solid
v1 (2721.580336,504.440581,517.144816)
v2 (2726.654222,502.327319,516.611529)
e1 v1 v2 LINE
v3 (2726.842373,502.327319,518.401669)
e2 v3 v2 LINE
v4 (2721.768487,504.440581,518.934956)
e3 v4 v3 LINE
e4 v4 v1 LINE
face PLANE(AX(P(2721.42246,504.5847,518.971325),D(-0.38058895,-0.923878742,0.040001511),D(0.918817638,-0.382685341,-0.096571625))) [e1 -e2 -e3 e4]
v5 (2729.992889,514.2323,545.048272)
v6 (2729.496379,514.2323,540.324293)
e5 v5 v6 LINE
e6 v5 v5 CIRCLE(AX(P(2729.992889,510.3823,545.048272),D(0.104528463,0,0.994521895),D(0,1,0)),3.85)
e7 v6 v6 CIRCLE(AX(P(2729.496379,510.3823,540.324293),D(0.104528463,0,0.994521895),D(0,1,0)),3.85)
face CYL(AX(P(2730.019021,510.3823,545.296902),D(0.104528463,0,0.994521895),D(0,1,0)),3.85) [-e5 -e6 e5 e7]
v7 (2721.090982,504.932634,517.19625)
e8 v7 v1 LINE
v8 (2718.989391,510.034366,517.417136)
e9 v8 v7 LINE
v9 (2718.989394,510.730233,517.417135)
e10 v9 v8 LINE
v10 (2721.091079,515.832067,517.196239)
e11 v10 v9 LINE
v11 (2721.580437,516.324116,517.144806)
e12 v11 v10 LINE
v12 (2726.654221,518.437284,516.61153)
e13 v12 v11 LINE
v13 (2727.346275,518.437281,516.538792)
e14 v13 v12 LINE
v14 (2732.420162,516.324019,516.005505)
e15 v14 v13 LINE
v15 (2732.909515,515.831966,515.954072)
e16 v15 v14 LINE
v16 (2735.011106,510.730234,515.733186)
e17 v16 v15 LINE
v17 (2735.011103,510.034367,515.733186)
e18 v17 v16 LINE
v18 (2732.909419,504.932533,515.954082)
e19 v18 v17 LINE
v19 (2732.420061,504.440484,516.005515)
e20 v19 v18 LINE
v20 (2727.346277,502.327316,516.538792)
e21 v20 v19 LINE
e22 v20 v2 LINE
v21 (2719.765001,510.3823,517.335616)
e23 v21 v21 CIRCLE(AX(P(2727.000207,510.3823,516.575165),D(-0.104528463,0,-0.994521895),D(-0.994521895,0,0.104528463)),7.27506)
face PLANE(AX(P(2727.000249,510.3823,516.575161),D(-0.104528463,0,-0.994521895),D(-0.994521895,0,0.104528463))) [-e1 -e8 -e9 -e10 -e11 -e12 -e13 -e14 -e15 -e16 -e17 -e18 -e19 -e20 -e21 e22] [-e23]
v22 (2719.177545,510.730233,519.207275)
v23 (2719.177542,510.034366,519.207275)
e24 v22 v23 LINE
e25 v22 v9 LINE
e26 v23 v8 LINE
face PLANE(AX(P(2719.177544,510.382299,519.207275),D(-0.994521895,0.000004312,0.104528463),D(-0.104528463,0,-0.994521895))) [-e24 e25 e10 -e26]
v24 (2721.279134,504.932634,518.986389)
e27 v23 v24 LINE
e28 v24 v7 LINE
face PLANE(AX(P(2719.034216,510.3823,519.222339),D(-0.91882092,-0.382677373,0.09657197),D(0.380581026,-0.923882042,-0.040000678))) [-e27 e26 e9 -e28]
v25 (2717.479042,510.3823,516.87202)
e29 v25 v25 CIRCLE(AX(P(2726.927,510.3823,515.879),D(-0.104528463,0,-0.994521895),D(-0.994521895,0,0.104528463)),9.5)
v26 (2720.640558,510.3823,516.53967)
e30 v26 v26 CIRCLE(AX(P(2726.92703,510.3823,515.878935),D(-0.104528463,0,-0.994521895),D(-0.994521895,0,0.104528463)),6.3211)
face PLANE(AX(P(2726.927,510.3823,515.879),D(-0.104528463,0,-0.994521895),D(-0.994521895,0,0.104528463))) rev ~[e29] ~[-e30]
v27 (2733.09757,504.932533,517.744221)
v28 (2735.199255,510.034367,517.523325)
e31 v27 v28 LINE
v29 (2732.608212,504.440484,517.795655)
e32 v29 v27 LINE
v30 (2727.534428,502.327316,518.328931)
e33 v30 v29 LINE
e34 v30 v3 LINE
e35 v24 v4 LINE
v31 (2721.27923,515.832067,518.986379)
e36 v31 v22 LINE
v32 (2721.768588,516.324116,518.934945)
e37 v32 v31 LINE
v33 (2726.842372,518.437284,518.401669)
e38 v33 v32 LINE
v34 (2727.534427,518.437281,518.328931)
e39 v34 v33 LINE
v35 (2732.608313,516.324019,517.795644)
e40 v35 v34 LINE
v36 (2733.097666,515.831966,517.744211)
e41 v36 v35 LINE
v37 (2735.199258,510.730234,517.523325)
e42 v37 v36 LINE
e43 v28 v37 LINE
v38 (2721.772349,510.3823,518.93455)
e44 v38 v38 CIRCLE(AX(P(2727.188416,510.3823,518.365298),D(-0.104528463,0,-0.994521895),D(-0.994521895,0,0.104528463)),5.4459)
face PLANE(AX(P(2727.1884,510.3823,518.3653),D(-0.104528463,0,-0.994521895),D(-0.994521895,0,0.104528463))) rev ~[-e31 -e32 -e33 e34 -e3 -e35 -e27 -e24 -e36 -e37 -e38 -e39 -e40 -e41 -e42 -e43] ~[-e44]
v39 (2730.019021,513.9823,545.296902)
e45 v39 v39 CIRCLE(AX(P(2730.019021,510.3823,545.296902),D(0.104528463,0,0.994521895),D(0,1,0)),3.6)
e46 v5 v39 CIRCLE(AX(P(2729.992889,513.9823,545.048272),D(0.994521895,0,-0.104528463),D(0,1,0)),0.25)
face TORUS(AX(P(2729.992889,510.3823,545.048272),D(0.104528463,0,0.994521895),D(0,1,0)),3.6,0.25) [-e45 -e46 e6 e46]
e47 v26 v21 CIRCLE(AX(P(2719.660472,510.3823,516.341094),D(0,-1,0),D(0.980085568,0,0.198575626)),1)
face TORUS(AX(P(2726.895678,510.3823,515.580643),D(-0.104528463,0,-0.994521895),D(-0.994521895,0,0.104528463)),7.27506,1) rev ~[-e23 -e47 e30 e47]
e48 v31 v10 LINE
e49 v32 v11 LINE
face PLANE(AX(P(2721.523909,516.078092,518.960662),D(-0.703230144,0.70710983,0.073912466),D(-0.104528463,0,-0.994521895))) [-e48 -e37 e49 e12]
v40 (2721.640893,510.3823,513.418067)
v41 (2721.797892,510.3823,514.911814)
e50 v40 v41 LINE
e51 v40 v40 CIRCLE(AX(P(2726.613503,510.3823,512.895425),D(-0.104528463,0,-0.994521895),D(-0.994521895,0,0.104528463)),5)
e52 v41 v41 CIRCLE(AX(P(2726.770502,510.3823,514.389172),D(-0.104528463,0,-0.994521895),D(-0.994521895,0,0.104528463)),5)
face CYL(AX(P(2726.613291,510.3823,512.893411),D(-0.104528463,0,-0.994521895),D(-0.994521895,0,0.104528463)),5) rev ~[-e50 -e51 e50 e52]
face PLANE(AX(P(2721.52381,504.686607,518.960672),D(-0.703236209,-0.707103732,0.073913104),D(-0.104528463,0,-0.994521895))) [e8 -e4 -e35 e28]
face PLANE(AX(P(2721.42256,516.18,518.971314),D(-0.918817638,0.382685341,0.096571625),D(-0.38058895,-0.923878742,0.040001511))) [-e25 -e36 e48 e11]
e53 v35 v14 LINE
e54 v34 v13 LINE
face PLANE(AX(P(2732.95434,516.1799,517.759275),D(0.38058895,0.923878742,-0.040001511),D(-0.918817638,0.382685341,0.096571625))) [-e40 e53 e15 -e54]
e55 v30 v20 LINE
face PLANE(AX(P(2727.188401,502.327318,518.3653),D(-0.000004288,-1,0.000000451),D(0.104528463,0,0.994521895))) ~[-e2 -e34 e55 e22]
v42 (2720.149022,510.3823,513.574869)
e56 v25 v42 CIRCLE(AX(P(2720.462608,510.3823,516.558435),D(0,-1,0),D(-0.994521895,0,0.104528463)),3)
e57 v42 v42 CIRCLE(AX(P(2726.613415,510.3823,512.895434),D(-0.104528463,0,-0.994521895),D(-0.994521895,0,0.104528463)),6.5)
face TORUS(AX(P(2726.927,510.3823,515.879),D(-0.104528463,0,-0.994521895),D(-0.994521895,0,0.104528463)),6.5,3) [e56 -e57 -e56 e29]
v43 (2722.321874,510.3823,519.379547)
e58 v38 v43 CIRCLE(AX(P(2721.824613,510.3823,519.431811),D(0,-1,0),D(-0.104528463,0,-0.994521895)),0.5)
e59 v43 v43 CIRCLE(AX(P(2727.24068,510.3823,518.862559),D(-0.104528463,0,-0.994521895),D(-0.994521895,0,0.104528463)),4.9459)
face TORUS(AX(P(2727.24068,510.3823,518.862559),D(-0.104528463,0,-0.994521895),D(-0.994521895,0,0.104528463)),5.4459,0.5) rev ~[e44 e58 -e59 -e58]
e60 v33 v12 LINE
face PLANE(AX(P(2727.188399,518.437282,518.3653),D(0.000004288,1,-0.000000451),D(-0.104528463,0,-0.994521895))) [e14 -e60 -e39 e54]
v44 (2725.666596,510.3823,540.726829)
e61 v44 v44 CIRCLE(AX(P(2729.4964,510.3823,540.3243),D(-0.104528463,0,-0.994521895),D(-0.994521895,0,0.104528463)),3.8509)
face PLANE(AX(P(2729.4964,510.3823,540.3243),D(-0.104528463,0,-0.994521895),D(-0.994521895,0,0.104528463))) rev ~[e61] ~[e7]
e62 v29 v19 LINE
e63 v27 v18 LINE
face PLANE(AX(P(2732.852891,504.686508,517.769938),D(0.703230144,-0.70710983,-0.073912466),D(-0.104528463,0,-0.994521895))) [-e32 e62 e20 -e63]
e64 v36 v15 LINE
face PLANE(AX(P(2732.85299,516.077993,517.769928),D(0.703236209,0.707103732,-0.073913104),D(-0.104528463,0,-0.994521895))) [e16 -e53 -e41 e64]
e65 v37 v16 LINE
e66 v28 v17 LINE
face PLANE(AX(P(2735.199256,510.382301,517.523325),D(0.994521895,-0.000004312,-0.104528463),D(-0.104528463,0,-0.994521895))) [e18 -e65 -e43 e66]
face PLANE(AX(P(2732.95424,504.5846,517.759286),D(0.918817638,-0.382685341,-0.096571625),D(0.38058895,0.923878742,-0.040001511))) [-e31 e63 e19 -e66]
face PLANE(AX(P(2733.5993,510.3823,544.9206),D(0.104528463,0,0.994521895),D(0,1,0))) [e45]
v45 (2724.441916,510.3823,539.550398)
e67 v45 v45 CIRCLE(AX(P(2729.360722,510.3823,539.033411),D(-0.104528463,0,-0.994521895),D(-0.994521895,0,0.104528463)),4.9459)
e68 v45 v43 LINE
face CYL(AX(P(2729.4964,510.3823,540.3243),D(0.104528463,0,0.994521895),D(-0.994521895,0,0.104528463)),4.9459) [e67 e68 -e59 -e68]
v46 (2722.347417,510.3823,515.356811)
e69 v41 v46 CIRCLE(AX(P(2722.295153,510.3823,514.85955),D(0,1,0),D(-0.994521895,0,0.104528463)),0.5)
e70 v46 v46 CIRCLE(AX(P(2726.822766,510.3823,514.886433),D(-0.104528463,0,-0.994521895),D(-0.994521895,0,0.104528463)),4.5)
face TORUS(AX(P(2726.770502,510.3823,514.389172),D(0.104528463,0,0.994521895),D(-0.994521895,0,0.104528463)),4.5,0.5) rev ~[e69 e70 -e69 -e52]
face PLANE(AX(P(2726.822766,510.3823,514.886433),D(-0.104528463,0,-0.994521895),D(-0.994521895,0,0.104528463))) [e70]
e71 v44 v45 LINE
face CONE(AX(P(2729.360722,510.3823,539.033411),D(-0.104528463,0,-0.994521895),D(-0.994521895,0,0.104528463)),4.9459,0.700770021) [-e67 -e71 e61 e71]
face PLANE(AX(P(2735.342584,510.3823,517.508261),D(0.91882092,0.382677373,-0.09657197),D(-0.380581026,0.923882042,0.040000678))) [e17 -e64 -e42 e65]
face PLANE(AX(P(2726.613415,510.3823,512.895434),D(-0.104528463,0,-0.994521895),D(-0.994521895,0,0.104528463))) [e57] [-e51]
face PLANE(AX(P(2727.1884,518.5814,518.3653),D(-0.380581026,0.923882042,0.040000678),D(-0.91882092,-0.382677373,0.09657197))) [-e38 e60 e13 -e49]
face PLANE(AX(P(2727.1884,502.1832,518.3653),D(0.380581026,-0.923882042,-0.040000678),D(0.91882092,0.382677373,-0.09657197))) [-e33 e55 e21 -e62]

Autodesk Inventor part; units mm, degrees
ref_plane "YZ Plane" through (0, 0, 0) normal (1, 0, 0) x (0, 1, 0)
ref_plane "Work Plane1" through (2733.5993, 510.3823, 544.9206) normal (0.1045285, 0, 0.9945219) x (0.0000001, 1, 0)
sketch "Sketch1" plane through (2733.5993, 510.3823, 544.9206) normal (0.1045285, 0, 0.9945219) x (0.0000001, 1, 0)
  circle A0 centre (0, 3.6) radius 3.85
  line L0 (-510.3825, -1.79) -> (-510.3825, 8.99) projected
  line L1 (-5.3902, 2661.6646) -> (5.3898, 2661.6646) projected
  line L2 (-510.3824, 8.99) -> (-510.3824, -1.79) projected
  dimension "d0" = 7.7
  dimension "d1" = 510.3825
  dimension "d2" = 2658.0646
extrude "Extrusion1" add sketch "Sketch1" against normal blind 5
sketch "Sketch2" plane through (2729.4964, 510.3823, 540.3243) normal (-0.1045285, 0, -0.9945219) x (-0.9945219, 0, 0.1045285)
  circle A0 centre (0, 0) radius 3.85 projected
  circle A1 centre (0, 0) radius 4.9459
  dimension "d5" = 9.8917
extrude "Extrusion2" add sketch "Sketch2" along normal blind 22.08 contours A0 | A1
sketch "Sketch3" plane through (2727.1884, 510.3823, 518.3653) normal (-0.1045285, 0, -0.9945219) x (-0.9945219, 0, 0.1045285)
  circle A0 centre (0, 0) radius 4.9459 projected
  line L0 (0, -8.1991) -> (-5.7976, -5.7977)
  line L1 (-5.7976, -5.7977) -> (-8.1991, 0)
  line L2 (-8.1991, 0) -> (-5.7977, 5.7976)
  line L3 (-5.7977, 5.7976) -> (0, 8.1991)
  line L4 (0, 8.1991) -> (5.7976, 5.7977)
  line L5 (5.7976, 5.7977) -> (8.1991, 0)
  line L6 (8.1991, 0) -> (5.7977, -5.7976)
  line L7 (5.7977, -5.7976) -> (0, -8.1991)
  line L8 (-12.0322, -510.3825) -> (14.7999, -510.3825) projected
  line L9 (2658.0646, -11.4788) -> (2658.0646, 11.4788) projected
  line L10 (14.7999, -510.3823) -> (-12.0323, -510.3823) projected
  dimension "d8" = 5.7976
  dimension "d9" = 2.4015
extrude "Extrusion3" add sketch "Sketch3" along normal blind 1.8 contours A0 | L0 L1 L2 L3 L4 L5 L6 L7
sketch "Sketch4" plane through (2727.0002, 510.3823, 516.5751) normal (-0.1045285, 0, -0.9945219) x (-0.9945219, 0, 0.1045285)
  circle A0 centre (0, 0) radius 6.3211
  line L0 (-12.2942, -510.3825) -> (15.0619, -510.3825) projected
  line L1 (2658.0646, -11.4788) -> (2658.0646, 11.4788) projected
  line L2 (15.0619, -510.3823) -> (-12.2942, -510.3823) projected
  dimension "d12" = 12.6421
  dimension "d14" = 510.3823
  dimension "d15" = 2658.0646
extrude "Extrusion4" add sketch "Sketch4" along normal blind 0.7
sketch "Sketch5" plane through (2726.927, 510.3823, 515.879) normal (-0.1045285, 0, -0.9945219) x (-0.9945219, 0, 0.1045285)
  circle A0 centre (0, 0) radius 6.3211 projected
  circle A1 centre (0, 0) radius 9.5
  dimension "d18" = 19
extrude "Extrusion5" add sketch "Sketch5" along normal blind 3 contours A0 | A1
fillet "Fillet1" radius 3 1 edges at (2736.0614, 510.3823, 511.9024)
fillet "Fillet1" radius 1 1 edges at (2733.2866, 510.3823, 515.9144)
fillet "Fillet1" radius 0.5 1 edges at (2732.1071, 510.3823, 517.8483)
fillet "Fillet1" radius 0.25 1 edges at (2730.019, 506.5323, 545.2969)
sketch "Sketch6" plane through (2726.6135, 510.3823, 512.8954) normal (-0.1045285, 0, -0.9945219) x (-0.9945219, 0, 0.1045285)
  circle A0 centre (0, 0) radius 6.5 projected
  circle A1 centre (0, 0) radius 5
  dimension "d25" = 10
extrude "Extrusion6" cut sketch "Sketch6" against normal blind 2 contours A1
fillet "Fillet2" radius 0.5 1 edges at (2731.7953, 510.3823, 514.3638)
chamfer "Chamfer2" distance 0.3766 angle 45 1 edges at (2727.0943, 502.1832, 517.4702)
chamfer "Chamfer3" distance 0.3766 angle 45 1 edges at (2732.8602, 504.5847, 516.8642)
chamfer "Chamfer4" distance 0.3766 angle 45 1 edges at (2735.2485, 510.3823, 516.6132)
chamfer "Chamfer5" distance 0.3766 angle 45 1 edges at (2732.8602, 516.18, 516.8642)
chamfer "Chamfer6" distance 0.3766 angle 45 1 edges at (2727.0943, 518.5815, 517.4702)
chamfer "Chamfer7" distance 0.3766 angle 45 1 edges at (2721.3284, 516.18, 518.0762)
chamfer "Chamfer8" distance 0.3766 angle 45 1 edges at (2718.9401, 510.3824, 518.3272)
chamfer "Chamfer9" distance 0.3766 angle 45 1 edges at (2721.3284, 504.5847, 518.0762)
ref_plane "Work Plane3" through (2730.0713, 509.1816, 518.0623) normal (0.3805886, 0.9238789, -0.0400015) x (-0.9188178, 0.382685, 0.0965716)
ref_plane "Work Plane2" through (2732.9543, 516.18, 517.7593) normal (0.3805886, 0.9238789, -0.0400015) x (-0.9188178, 0.382685, 0.0965716)
chamfer "Chamfer10" distance 1.095 distance2 1.298 1 edges at (2734.4151, 510.3823, 539.8073) measured on face at (2728.4119, 514.8065, 540.4383)
thread "Thread1" size "M10x1.5" class "6g" standard "ANSI Metric M Profile" full length
properties part number "314-10" material "Steel, Mild"
